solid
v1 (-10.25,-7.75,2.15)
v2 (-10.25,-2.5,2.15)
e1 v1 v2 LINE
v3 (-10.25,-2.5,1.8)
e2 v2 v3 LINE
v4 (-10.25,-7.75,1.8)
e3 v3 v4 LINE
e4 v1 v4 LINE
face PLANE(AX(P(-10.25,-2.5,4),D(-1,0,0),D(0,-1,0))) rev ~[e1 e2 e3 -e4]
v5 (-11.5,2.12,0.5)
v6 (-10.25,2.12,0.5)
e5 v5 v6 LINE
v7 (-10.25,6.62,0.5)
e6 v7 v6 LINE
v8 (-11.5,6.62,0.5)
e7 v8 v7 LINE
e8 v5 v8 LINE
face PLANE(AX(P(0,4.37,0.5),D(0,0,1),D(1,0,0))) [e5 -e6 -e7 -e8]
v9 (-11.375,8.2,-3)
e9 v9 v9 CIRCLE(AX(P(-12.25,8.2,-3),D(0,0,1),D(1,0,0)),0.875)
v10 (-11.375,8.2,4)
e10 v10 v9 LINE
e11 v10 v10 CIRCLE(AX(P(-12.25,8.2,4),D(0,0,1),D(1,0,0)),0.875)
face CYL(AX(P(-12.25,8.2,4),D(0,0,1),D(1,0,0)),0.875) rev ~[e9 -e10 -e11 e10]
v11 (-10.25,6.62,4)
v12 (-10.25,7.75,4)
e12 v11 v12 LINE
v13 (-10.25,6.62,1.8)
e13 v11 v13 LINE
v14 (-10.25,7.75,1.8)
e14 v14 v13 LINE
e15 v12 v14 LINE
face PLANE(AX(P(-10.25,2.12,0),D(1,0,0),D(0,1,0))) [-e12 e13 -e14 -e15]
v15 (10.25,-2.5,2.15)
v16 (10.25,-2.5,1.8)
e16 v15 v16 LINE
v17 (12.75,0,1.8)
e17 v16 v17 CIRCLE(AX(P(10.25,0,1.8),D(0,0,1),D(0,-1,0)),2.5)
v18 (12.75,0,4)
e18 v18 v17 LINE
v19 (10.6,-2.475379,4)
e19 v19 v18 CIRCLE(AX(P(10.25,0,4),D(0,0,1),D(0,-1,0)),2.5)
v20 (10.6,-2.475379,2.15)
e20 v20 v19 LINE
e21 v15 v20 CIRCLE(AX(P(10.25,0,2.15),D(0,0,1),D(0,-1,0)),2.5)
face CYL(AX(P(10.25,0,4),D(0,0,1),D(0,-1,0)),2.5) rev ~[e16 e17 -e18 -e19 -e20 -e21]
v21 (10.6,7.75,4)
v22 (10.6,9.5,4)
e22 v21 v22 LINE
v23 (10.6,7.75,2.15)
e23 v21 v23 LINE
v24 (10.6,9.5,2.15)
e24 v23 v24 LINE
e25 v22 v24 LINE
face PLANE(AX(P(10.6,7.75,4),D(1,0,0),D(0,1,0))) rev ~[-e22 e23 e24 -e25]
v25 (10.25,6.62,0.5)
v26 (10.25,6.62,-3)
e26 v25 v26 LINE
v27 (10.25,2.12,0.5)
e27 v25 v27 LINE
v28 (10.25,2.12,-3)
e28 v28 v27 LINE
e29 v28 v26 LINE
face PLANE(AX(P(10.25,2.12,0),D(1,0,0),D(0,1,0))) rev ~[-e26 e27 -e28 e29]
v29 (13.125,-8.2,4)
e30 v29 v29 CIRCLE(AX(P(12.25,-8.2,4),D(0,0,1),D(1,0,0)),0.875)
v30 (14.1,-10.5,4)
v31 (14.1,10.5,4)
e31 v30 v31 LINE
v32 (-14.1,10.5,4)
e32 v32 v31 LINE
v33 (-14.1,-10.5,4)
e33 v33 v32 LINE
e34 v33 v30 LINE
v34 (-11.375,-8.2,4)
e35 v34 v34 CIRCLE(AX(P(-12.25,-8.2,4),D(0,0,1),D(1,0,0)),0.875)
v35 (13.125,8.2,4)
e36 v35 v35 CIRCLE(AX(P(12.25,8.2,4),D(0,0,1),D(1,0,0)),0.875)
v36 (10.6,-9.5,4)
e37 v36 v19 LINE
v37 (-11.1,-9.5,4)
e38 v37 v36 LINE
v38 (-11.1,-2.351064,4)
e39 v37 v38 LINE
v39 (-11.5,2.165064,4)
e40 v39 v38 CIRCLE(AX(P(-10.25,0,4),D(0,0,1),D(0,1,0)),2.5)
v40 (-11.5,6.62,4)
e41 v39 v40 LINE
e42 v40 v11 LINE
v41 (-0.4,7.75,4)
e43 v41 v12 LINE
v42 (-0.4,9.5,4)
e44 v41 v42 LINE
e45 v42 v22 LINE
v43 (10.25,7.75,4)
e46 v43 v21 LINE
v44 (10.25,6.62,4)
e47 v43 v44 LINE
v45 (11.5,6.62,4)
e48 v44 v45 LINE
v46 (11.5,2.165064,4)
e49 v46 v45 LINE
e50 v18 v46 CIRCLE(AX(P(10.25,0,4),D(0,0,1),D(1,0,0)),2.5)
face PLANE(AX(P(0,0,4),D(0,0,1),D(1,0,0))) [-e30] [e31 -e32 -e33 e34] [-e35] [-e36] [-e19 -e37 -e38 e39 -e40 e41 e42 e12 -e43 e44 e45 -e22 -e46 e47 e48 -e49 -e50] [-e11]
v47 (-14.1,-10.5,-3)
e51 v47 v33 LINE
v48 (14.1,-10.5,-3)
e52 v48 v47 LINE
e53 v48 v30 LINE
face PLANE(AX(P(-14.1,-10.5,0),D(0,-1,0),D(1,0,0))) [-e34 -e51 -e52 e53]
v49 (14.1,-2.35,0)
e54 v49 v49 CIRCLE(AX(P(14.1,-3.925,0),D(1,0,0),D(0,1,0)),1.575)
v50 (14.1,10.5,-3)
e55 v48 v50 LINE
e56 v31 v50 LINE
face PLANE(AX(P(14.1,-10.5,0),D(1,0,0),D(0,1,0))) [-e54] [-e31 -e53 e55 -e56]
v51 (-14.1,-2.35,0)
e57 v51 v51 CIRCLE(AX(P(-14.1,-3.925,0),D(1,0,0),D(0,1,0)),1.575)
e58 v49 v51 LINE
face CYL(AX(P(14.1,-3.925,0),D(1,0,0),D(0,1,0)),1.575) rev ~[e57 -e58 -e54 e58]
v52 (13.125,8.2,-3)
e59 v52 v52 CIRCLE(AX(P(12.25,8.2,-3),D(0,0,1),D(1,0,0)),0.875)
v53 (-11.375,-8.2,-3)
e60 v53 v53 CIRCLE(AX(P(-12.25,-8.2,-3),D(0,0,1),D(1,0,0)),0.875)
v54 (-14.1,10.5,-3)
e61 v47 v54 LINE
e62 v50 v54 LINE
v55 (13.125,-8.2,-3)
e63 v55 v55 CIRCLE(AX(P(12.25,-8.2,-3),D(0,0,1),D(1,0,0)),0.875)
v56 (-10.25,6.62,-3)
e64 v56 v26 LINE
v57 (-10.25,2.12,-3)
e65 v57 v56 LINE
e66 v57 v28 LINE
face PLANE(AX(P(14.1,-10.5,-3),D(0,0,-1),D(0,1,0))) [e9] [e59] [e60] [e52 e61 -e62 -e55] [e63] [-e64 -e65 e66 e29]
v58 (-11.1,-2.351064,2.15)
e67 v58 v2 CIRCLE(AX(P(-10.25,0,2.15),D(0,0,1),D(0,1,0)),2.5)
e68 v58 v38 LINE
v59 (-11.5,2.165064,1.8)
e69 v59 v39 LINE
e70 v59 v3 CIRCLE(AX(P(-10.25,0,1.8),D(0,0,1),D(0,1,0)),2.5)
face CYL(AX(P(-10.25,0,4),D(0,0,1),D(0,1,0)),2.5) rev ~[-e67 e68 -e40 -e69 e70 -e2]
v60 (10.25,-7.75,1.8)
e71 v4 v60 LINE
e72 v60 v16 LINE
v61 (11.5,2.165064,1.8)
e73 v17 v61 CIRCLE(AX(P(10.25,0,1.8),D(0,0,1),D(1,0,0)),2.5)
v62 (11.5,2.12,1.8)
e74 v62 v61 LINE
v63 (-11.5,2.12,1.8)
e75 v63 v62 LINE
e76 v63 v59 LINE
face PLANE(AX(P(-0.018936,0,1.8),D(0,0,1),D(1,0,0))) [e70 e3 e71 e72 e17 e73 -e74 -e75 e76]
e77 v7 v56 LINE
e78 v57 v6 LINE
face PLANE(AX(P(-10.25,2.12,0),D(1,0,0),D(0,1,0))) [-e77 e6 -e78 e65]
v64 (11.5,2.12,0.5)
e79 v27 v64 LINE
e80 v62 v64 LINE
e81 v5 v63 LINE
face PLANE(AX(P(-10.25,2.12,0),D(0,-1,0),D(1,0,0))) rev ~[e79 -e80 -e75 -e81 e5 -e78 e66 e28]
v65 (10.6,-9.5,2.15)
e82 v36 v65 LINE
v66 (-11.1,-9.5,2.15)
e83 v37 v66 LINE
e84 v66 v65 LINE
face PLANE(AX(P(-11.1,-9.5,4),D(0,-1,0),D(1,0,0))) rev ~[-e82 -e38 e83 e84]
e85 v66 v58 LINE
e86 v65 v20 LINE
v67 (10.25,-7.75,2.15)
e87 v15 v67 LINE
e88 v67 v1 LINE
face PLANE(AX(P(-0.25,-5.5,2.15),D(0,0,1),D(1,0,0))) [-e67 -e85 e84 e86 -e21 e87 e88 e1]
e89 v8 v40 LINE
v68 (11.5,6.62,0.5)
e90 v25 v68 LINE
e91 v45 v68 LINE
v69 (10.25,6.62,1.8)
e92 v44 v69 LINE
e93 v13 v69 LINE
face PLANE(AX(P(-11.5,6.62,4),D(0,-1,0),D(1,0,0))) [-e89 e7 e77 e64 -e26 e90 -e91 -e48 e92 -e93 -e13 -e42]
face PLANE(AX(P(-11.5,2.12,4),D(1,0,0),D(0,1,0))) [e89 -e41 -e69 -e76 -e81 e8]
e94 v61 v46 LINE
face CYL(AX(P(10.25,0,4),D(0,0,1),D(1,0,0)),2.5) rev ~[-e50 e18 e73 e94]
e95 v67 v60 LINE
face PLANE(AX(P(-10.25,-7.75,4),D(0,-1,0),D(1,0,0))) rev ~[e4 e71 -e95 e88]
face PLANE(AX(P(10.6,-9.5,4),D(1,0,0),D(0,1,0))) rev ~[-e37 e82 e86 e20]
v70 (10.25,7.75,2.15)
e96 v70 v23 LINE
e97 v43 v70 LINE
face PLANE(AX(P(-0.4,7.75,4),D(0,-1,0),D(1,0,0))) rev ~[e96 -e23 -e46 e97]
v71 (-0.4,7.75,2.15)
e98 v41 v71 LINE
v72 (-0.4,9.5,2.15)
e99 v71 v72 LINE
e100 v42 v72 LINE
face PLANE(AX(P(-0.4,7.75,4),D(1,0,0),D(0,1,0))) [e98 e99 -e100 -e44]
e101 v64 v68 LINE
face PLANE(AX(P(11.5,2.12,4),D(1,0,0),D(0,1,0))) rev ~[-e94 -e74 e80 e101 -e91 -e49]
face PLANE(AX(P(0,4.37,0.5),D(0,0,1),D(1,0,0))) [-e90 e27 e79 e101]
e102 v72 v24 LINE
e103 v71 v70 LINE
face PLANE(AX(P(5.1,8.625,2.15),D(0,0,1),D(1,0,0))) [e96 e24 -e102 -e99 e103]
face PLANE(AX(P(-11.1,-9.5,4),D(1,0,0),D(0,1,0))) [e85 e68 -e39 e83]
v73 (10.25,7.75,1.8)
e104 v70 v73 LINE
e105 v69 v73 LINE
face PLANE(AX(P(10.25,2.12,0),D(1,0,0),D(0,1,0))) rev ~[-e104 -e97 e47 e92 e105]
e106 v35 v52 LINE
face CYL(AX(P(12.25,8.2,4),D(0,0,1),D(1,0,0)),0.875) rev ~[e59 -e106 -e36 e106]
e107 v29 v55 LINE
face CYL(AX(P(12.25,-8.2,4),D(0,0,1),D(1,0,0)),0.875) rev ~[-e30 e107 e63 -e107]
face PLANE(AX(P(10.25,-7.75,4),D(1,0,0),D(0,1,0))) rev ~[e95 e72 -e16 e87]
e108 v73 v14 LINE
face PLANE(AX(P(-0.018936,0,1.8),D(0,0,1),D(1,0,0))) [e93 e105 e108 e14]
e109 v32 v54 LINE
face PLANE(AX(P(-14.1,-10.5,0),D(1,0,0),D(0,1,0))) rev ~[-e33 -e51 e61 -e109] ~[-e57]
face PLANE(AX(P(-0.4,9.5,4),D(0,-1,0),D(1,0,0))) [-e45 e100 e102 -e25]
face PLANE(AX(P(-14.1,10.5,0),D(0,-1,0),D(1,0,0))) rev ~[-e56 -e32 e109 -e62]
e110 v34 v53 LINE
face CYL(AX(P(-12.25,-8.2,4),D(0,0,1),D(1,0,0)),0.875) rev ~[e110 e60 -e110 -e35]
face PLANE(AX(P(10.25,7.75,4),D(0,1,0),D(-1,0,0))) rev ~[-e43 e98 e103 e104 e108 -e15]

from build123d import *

# Parameters (mm, degrees)
F0_W      = 28.2
F0_H      = 21
F1_DEPTH  = 4
F3_DEPTH  = 2.2
F5_R      = 0.875
F6_DEPTH  = 25
F7_W      = 20.5
F7_H      = 4.5
F8_DEPTH  = 27.5
F9_R      = 1.575
F10_DEPTH = 29
F11_W     = 21
F11_H     = 1
F12_DEPTH = 28.2
F13_W     = 23
F13_H     = 4.5
F14_DEPTH = 3.5
F15_DEPTH = 3
F16_W     = 11
F16_H     = 1.75
F17_DEPTH = 1.85
F18_W     = 21.7
F18_H     = 8
F19_DEPTH = 1.85


# Not quite as in the source:
# - a feature names something its author has since deleted; it is built from what else it names


with BuildPart() as f1:
    # F0 (on Top) → F1 (new body, symmetric)
    with BuildSketch(Plane.XY):
        Rectangle(F0_W, F0_H)
    extrude(amount=F1_DEPTH, both=True)

    # F2 (on face) → F3 (cut)
    with BuildSketch(Plane.XY.offset(4)):
        with BuildLine():
            Line((10.25, 7.75), (-10.25, 7.75))
            Line((-10.25, 7.75), (-10.25, 2.5))
            ThreePointArc((-10.25, 2.5), (-8.482233047, 1.767766953), (-7.75, 0))
            ThreePointArc((-7.75, 0), (-8.482233047, -1.767766953), (-10.25, -2.5))
            Line((-10.25, -2.5), (-10.25, -7.75))
            Line((-10.25, -7.75), (10.25, -7.75))
            Line((10.25, -7.75), (10.25, -2.5))
            ThreePointArc((10.25, -2.5), (7.75, 0), (10.25, 2.5))
            Line((10.25, 2.5), (10.25, 7.75))
        make_face()
        with BuildLine():
            ThreePointArc((-7.75, 0), (-8.482233047, 1.767766953), (-10.25, 2.5))
            Line((-10.25, 2.5), (-10.25, -2.5))
            ThreePointArc((-10.25, -2.5), (-8.482233047, -1.767766953), (-7.75, 0))
        make_face()
        with BuildLine():
            Line((-10.25, -2.5), (-10.25, 2.5))
            ThreePointArc((-10.25, 2.5), (-12.75, 0), (-10.25, -2.5))
        make_face()
        with BuildLine():
            ThreePointArc((12.75, 0), (12.017766953, 1.767766953), (10.25, 2.5))
            Line((10.25, 2.5), (10.25, -2.5))
            ThreePointArc((10.25, -2.5), (12.017766953, -1.767766953), (12.75, 0))
        make_face()
        with BuildLine():
            Line((10.25, -2.5), (10.25, 2.5))
            ThreePointArc((10.25, 2.5), (7.75, 0), (10.25, -2.5))
        make_face()
    extrude(amount=-F3_DEPTH, mode=Mode.SUBTRACT)

    # F5 (on face) → F6 (cut)
    with BuildSketch(Plane.XY.offset(4)):
        with Locations((-12.25, 8.2)):
            Circle(F5_R)
        with Locations((12.25, 8.2)):
            Circle(F5_R)
        with Locations((12.25, -8.2)):
            Circle(F5_R)
        with Locations((-12.25, -8.2)):
            Circle(F5_R)
    extrude(amount=-F6_DEPTH, mode=Mode.SUBTRACT)

    # F7 (on Top) → F8 (cut, symmetric)
    with BuildSketch(Plane.XY):
        with Locations((0, 4.37)):
            Rectangle(F7_W, F7_H)
    extrude(amount=F8_DEPTH, both=True, mode=Mode.SUBTRACT)

    # F9 (on face) → F10 (cut)
    with BuildSketch(Plane.YZ.offset(14.1)):
        with Locations((-3.925, 0)):
            Circle(F9_R)
    extrude(amount=-F10_DEPTH, mode=Mode.SUBTRACT)

    # F11 (on face) → F12 (cut)
    with BuildSketch(Plane.YZ.offset(14.1)):
        with Locations((0, -3.5)):
            Rectangle(F11_W, F11_H)
    extrude(amount=-F12_DEPTH, mode=Mode.SUBTRACT)

    # F13 (on face) → F14 (cut)
    with BuildSketch(Plane.XY.offset(4)):
        with Locations((0, 4.37)):
            Rectangle(F13_W, F13_H)
    extrude(amount=-F14_DEPTH, mode=Mode.SUBTRACT)

    # F13 (on face) → F15 (cut)
    with BuildSketch(Plane.XY.offset(4)):
        with Locations((0, 4.37)):
            Rectangle(F13_W, F13_H)
    extrude(amount=-F15_DEPTH, mode=Mode.SUBTRACT)

    # F16 (on face) → F17 (cut)
    with BuildSketch(Plane.XY.offset(4)):
        with Locations((5.1, 8.625)):
            Rectangle(F16_W, F16_H)
    extrude(amount=-F17_DEPTH, mode=Mode.SUBTRACT)

    # F18 (on face) → F19 (cut)
    with BuildSketch(Plane.XY.offset(4)):
        with Locations((-0.25, -5.5)):
            Rectangle(F18_W, F18_H)
    extrude(amount=-F19_DEPTH, mode=Mode.SUBTRACT)


solid = f1.part
